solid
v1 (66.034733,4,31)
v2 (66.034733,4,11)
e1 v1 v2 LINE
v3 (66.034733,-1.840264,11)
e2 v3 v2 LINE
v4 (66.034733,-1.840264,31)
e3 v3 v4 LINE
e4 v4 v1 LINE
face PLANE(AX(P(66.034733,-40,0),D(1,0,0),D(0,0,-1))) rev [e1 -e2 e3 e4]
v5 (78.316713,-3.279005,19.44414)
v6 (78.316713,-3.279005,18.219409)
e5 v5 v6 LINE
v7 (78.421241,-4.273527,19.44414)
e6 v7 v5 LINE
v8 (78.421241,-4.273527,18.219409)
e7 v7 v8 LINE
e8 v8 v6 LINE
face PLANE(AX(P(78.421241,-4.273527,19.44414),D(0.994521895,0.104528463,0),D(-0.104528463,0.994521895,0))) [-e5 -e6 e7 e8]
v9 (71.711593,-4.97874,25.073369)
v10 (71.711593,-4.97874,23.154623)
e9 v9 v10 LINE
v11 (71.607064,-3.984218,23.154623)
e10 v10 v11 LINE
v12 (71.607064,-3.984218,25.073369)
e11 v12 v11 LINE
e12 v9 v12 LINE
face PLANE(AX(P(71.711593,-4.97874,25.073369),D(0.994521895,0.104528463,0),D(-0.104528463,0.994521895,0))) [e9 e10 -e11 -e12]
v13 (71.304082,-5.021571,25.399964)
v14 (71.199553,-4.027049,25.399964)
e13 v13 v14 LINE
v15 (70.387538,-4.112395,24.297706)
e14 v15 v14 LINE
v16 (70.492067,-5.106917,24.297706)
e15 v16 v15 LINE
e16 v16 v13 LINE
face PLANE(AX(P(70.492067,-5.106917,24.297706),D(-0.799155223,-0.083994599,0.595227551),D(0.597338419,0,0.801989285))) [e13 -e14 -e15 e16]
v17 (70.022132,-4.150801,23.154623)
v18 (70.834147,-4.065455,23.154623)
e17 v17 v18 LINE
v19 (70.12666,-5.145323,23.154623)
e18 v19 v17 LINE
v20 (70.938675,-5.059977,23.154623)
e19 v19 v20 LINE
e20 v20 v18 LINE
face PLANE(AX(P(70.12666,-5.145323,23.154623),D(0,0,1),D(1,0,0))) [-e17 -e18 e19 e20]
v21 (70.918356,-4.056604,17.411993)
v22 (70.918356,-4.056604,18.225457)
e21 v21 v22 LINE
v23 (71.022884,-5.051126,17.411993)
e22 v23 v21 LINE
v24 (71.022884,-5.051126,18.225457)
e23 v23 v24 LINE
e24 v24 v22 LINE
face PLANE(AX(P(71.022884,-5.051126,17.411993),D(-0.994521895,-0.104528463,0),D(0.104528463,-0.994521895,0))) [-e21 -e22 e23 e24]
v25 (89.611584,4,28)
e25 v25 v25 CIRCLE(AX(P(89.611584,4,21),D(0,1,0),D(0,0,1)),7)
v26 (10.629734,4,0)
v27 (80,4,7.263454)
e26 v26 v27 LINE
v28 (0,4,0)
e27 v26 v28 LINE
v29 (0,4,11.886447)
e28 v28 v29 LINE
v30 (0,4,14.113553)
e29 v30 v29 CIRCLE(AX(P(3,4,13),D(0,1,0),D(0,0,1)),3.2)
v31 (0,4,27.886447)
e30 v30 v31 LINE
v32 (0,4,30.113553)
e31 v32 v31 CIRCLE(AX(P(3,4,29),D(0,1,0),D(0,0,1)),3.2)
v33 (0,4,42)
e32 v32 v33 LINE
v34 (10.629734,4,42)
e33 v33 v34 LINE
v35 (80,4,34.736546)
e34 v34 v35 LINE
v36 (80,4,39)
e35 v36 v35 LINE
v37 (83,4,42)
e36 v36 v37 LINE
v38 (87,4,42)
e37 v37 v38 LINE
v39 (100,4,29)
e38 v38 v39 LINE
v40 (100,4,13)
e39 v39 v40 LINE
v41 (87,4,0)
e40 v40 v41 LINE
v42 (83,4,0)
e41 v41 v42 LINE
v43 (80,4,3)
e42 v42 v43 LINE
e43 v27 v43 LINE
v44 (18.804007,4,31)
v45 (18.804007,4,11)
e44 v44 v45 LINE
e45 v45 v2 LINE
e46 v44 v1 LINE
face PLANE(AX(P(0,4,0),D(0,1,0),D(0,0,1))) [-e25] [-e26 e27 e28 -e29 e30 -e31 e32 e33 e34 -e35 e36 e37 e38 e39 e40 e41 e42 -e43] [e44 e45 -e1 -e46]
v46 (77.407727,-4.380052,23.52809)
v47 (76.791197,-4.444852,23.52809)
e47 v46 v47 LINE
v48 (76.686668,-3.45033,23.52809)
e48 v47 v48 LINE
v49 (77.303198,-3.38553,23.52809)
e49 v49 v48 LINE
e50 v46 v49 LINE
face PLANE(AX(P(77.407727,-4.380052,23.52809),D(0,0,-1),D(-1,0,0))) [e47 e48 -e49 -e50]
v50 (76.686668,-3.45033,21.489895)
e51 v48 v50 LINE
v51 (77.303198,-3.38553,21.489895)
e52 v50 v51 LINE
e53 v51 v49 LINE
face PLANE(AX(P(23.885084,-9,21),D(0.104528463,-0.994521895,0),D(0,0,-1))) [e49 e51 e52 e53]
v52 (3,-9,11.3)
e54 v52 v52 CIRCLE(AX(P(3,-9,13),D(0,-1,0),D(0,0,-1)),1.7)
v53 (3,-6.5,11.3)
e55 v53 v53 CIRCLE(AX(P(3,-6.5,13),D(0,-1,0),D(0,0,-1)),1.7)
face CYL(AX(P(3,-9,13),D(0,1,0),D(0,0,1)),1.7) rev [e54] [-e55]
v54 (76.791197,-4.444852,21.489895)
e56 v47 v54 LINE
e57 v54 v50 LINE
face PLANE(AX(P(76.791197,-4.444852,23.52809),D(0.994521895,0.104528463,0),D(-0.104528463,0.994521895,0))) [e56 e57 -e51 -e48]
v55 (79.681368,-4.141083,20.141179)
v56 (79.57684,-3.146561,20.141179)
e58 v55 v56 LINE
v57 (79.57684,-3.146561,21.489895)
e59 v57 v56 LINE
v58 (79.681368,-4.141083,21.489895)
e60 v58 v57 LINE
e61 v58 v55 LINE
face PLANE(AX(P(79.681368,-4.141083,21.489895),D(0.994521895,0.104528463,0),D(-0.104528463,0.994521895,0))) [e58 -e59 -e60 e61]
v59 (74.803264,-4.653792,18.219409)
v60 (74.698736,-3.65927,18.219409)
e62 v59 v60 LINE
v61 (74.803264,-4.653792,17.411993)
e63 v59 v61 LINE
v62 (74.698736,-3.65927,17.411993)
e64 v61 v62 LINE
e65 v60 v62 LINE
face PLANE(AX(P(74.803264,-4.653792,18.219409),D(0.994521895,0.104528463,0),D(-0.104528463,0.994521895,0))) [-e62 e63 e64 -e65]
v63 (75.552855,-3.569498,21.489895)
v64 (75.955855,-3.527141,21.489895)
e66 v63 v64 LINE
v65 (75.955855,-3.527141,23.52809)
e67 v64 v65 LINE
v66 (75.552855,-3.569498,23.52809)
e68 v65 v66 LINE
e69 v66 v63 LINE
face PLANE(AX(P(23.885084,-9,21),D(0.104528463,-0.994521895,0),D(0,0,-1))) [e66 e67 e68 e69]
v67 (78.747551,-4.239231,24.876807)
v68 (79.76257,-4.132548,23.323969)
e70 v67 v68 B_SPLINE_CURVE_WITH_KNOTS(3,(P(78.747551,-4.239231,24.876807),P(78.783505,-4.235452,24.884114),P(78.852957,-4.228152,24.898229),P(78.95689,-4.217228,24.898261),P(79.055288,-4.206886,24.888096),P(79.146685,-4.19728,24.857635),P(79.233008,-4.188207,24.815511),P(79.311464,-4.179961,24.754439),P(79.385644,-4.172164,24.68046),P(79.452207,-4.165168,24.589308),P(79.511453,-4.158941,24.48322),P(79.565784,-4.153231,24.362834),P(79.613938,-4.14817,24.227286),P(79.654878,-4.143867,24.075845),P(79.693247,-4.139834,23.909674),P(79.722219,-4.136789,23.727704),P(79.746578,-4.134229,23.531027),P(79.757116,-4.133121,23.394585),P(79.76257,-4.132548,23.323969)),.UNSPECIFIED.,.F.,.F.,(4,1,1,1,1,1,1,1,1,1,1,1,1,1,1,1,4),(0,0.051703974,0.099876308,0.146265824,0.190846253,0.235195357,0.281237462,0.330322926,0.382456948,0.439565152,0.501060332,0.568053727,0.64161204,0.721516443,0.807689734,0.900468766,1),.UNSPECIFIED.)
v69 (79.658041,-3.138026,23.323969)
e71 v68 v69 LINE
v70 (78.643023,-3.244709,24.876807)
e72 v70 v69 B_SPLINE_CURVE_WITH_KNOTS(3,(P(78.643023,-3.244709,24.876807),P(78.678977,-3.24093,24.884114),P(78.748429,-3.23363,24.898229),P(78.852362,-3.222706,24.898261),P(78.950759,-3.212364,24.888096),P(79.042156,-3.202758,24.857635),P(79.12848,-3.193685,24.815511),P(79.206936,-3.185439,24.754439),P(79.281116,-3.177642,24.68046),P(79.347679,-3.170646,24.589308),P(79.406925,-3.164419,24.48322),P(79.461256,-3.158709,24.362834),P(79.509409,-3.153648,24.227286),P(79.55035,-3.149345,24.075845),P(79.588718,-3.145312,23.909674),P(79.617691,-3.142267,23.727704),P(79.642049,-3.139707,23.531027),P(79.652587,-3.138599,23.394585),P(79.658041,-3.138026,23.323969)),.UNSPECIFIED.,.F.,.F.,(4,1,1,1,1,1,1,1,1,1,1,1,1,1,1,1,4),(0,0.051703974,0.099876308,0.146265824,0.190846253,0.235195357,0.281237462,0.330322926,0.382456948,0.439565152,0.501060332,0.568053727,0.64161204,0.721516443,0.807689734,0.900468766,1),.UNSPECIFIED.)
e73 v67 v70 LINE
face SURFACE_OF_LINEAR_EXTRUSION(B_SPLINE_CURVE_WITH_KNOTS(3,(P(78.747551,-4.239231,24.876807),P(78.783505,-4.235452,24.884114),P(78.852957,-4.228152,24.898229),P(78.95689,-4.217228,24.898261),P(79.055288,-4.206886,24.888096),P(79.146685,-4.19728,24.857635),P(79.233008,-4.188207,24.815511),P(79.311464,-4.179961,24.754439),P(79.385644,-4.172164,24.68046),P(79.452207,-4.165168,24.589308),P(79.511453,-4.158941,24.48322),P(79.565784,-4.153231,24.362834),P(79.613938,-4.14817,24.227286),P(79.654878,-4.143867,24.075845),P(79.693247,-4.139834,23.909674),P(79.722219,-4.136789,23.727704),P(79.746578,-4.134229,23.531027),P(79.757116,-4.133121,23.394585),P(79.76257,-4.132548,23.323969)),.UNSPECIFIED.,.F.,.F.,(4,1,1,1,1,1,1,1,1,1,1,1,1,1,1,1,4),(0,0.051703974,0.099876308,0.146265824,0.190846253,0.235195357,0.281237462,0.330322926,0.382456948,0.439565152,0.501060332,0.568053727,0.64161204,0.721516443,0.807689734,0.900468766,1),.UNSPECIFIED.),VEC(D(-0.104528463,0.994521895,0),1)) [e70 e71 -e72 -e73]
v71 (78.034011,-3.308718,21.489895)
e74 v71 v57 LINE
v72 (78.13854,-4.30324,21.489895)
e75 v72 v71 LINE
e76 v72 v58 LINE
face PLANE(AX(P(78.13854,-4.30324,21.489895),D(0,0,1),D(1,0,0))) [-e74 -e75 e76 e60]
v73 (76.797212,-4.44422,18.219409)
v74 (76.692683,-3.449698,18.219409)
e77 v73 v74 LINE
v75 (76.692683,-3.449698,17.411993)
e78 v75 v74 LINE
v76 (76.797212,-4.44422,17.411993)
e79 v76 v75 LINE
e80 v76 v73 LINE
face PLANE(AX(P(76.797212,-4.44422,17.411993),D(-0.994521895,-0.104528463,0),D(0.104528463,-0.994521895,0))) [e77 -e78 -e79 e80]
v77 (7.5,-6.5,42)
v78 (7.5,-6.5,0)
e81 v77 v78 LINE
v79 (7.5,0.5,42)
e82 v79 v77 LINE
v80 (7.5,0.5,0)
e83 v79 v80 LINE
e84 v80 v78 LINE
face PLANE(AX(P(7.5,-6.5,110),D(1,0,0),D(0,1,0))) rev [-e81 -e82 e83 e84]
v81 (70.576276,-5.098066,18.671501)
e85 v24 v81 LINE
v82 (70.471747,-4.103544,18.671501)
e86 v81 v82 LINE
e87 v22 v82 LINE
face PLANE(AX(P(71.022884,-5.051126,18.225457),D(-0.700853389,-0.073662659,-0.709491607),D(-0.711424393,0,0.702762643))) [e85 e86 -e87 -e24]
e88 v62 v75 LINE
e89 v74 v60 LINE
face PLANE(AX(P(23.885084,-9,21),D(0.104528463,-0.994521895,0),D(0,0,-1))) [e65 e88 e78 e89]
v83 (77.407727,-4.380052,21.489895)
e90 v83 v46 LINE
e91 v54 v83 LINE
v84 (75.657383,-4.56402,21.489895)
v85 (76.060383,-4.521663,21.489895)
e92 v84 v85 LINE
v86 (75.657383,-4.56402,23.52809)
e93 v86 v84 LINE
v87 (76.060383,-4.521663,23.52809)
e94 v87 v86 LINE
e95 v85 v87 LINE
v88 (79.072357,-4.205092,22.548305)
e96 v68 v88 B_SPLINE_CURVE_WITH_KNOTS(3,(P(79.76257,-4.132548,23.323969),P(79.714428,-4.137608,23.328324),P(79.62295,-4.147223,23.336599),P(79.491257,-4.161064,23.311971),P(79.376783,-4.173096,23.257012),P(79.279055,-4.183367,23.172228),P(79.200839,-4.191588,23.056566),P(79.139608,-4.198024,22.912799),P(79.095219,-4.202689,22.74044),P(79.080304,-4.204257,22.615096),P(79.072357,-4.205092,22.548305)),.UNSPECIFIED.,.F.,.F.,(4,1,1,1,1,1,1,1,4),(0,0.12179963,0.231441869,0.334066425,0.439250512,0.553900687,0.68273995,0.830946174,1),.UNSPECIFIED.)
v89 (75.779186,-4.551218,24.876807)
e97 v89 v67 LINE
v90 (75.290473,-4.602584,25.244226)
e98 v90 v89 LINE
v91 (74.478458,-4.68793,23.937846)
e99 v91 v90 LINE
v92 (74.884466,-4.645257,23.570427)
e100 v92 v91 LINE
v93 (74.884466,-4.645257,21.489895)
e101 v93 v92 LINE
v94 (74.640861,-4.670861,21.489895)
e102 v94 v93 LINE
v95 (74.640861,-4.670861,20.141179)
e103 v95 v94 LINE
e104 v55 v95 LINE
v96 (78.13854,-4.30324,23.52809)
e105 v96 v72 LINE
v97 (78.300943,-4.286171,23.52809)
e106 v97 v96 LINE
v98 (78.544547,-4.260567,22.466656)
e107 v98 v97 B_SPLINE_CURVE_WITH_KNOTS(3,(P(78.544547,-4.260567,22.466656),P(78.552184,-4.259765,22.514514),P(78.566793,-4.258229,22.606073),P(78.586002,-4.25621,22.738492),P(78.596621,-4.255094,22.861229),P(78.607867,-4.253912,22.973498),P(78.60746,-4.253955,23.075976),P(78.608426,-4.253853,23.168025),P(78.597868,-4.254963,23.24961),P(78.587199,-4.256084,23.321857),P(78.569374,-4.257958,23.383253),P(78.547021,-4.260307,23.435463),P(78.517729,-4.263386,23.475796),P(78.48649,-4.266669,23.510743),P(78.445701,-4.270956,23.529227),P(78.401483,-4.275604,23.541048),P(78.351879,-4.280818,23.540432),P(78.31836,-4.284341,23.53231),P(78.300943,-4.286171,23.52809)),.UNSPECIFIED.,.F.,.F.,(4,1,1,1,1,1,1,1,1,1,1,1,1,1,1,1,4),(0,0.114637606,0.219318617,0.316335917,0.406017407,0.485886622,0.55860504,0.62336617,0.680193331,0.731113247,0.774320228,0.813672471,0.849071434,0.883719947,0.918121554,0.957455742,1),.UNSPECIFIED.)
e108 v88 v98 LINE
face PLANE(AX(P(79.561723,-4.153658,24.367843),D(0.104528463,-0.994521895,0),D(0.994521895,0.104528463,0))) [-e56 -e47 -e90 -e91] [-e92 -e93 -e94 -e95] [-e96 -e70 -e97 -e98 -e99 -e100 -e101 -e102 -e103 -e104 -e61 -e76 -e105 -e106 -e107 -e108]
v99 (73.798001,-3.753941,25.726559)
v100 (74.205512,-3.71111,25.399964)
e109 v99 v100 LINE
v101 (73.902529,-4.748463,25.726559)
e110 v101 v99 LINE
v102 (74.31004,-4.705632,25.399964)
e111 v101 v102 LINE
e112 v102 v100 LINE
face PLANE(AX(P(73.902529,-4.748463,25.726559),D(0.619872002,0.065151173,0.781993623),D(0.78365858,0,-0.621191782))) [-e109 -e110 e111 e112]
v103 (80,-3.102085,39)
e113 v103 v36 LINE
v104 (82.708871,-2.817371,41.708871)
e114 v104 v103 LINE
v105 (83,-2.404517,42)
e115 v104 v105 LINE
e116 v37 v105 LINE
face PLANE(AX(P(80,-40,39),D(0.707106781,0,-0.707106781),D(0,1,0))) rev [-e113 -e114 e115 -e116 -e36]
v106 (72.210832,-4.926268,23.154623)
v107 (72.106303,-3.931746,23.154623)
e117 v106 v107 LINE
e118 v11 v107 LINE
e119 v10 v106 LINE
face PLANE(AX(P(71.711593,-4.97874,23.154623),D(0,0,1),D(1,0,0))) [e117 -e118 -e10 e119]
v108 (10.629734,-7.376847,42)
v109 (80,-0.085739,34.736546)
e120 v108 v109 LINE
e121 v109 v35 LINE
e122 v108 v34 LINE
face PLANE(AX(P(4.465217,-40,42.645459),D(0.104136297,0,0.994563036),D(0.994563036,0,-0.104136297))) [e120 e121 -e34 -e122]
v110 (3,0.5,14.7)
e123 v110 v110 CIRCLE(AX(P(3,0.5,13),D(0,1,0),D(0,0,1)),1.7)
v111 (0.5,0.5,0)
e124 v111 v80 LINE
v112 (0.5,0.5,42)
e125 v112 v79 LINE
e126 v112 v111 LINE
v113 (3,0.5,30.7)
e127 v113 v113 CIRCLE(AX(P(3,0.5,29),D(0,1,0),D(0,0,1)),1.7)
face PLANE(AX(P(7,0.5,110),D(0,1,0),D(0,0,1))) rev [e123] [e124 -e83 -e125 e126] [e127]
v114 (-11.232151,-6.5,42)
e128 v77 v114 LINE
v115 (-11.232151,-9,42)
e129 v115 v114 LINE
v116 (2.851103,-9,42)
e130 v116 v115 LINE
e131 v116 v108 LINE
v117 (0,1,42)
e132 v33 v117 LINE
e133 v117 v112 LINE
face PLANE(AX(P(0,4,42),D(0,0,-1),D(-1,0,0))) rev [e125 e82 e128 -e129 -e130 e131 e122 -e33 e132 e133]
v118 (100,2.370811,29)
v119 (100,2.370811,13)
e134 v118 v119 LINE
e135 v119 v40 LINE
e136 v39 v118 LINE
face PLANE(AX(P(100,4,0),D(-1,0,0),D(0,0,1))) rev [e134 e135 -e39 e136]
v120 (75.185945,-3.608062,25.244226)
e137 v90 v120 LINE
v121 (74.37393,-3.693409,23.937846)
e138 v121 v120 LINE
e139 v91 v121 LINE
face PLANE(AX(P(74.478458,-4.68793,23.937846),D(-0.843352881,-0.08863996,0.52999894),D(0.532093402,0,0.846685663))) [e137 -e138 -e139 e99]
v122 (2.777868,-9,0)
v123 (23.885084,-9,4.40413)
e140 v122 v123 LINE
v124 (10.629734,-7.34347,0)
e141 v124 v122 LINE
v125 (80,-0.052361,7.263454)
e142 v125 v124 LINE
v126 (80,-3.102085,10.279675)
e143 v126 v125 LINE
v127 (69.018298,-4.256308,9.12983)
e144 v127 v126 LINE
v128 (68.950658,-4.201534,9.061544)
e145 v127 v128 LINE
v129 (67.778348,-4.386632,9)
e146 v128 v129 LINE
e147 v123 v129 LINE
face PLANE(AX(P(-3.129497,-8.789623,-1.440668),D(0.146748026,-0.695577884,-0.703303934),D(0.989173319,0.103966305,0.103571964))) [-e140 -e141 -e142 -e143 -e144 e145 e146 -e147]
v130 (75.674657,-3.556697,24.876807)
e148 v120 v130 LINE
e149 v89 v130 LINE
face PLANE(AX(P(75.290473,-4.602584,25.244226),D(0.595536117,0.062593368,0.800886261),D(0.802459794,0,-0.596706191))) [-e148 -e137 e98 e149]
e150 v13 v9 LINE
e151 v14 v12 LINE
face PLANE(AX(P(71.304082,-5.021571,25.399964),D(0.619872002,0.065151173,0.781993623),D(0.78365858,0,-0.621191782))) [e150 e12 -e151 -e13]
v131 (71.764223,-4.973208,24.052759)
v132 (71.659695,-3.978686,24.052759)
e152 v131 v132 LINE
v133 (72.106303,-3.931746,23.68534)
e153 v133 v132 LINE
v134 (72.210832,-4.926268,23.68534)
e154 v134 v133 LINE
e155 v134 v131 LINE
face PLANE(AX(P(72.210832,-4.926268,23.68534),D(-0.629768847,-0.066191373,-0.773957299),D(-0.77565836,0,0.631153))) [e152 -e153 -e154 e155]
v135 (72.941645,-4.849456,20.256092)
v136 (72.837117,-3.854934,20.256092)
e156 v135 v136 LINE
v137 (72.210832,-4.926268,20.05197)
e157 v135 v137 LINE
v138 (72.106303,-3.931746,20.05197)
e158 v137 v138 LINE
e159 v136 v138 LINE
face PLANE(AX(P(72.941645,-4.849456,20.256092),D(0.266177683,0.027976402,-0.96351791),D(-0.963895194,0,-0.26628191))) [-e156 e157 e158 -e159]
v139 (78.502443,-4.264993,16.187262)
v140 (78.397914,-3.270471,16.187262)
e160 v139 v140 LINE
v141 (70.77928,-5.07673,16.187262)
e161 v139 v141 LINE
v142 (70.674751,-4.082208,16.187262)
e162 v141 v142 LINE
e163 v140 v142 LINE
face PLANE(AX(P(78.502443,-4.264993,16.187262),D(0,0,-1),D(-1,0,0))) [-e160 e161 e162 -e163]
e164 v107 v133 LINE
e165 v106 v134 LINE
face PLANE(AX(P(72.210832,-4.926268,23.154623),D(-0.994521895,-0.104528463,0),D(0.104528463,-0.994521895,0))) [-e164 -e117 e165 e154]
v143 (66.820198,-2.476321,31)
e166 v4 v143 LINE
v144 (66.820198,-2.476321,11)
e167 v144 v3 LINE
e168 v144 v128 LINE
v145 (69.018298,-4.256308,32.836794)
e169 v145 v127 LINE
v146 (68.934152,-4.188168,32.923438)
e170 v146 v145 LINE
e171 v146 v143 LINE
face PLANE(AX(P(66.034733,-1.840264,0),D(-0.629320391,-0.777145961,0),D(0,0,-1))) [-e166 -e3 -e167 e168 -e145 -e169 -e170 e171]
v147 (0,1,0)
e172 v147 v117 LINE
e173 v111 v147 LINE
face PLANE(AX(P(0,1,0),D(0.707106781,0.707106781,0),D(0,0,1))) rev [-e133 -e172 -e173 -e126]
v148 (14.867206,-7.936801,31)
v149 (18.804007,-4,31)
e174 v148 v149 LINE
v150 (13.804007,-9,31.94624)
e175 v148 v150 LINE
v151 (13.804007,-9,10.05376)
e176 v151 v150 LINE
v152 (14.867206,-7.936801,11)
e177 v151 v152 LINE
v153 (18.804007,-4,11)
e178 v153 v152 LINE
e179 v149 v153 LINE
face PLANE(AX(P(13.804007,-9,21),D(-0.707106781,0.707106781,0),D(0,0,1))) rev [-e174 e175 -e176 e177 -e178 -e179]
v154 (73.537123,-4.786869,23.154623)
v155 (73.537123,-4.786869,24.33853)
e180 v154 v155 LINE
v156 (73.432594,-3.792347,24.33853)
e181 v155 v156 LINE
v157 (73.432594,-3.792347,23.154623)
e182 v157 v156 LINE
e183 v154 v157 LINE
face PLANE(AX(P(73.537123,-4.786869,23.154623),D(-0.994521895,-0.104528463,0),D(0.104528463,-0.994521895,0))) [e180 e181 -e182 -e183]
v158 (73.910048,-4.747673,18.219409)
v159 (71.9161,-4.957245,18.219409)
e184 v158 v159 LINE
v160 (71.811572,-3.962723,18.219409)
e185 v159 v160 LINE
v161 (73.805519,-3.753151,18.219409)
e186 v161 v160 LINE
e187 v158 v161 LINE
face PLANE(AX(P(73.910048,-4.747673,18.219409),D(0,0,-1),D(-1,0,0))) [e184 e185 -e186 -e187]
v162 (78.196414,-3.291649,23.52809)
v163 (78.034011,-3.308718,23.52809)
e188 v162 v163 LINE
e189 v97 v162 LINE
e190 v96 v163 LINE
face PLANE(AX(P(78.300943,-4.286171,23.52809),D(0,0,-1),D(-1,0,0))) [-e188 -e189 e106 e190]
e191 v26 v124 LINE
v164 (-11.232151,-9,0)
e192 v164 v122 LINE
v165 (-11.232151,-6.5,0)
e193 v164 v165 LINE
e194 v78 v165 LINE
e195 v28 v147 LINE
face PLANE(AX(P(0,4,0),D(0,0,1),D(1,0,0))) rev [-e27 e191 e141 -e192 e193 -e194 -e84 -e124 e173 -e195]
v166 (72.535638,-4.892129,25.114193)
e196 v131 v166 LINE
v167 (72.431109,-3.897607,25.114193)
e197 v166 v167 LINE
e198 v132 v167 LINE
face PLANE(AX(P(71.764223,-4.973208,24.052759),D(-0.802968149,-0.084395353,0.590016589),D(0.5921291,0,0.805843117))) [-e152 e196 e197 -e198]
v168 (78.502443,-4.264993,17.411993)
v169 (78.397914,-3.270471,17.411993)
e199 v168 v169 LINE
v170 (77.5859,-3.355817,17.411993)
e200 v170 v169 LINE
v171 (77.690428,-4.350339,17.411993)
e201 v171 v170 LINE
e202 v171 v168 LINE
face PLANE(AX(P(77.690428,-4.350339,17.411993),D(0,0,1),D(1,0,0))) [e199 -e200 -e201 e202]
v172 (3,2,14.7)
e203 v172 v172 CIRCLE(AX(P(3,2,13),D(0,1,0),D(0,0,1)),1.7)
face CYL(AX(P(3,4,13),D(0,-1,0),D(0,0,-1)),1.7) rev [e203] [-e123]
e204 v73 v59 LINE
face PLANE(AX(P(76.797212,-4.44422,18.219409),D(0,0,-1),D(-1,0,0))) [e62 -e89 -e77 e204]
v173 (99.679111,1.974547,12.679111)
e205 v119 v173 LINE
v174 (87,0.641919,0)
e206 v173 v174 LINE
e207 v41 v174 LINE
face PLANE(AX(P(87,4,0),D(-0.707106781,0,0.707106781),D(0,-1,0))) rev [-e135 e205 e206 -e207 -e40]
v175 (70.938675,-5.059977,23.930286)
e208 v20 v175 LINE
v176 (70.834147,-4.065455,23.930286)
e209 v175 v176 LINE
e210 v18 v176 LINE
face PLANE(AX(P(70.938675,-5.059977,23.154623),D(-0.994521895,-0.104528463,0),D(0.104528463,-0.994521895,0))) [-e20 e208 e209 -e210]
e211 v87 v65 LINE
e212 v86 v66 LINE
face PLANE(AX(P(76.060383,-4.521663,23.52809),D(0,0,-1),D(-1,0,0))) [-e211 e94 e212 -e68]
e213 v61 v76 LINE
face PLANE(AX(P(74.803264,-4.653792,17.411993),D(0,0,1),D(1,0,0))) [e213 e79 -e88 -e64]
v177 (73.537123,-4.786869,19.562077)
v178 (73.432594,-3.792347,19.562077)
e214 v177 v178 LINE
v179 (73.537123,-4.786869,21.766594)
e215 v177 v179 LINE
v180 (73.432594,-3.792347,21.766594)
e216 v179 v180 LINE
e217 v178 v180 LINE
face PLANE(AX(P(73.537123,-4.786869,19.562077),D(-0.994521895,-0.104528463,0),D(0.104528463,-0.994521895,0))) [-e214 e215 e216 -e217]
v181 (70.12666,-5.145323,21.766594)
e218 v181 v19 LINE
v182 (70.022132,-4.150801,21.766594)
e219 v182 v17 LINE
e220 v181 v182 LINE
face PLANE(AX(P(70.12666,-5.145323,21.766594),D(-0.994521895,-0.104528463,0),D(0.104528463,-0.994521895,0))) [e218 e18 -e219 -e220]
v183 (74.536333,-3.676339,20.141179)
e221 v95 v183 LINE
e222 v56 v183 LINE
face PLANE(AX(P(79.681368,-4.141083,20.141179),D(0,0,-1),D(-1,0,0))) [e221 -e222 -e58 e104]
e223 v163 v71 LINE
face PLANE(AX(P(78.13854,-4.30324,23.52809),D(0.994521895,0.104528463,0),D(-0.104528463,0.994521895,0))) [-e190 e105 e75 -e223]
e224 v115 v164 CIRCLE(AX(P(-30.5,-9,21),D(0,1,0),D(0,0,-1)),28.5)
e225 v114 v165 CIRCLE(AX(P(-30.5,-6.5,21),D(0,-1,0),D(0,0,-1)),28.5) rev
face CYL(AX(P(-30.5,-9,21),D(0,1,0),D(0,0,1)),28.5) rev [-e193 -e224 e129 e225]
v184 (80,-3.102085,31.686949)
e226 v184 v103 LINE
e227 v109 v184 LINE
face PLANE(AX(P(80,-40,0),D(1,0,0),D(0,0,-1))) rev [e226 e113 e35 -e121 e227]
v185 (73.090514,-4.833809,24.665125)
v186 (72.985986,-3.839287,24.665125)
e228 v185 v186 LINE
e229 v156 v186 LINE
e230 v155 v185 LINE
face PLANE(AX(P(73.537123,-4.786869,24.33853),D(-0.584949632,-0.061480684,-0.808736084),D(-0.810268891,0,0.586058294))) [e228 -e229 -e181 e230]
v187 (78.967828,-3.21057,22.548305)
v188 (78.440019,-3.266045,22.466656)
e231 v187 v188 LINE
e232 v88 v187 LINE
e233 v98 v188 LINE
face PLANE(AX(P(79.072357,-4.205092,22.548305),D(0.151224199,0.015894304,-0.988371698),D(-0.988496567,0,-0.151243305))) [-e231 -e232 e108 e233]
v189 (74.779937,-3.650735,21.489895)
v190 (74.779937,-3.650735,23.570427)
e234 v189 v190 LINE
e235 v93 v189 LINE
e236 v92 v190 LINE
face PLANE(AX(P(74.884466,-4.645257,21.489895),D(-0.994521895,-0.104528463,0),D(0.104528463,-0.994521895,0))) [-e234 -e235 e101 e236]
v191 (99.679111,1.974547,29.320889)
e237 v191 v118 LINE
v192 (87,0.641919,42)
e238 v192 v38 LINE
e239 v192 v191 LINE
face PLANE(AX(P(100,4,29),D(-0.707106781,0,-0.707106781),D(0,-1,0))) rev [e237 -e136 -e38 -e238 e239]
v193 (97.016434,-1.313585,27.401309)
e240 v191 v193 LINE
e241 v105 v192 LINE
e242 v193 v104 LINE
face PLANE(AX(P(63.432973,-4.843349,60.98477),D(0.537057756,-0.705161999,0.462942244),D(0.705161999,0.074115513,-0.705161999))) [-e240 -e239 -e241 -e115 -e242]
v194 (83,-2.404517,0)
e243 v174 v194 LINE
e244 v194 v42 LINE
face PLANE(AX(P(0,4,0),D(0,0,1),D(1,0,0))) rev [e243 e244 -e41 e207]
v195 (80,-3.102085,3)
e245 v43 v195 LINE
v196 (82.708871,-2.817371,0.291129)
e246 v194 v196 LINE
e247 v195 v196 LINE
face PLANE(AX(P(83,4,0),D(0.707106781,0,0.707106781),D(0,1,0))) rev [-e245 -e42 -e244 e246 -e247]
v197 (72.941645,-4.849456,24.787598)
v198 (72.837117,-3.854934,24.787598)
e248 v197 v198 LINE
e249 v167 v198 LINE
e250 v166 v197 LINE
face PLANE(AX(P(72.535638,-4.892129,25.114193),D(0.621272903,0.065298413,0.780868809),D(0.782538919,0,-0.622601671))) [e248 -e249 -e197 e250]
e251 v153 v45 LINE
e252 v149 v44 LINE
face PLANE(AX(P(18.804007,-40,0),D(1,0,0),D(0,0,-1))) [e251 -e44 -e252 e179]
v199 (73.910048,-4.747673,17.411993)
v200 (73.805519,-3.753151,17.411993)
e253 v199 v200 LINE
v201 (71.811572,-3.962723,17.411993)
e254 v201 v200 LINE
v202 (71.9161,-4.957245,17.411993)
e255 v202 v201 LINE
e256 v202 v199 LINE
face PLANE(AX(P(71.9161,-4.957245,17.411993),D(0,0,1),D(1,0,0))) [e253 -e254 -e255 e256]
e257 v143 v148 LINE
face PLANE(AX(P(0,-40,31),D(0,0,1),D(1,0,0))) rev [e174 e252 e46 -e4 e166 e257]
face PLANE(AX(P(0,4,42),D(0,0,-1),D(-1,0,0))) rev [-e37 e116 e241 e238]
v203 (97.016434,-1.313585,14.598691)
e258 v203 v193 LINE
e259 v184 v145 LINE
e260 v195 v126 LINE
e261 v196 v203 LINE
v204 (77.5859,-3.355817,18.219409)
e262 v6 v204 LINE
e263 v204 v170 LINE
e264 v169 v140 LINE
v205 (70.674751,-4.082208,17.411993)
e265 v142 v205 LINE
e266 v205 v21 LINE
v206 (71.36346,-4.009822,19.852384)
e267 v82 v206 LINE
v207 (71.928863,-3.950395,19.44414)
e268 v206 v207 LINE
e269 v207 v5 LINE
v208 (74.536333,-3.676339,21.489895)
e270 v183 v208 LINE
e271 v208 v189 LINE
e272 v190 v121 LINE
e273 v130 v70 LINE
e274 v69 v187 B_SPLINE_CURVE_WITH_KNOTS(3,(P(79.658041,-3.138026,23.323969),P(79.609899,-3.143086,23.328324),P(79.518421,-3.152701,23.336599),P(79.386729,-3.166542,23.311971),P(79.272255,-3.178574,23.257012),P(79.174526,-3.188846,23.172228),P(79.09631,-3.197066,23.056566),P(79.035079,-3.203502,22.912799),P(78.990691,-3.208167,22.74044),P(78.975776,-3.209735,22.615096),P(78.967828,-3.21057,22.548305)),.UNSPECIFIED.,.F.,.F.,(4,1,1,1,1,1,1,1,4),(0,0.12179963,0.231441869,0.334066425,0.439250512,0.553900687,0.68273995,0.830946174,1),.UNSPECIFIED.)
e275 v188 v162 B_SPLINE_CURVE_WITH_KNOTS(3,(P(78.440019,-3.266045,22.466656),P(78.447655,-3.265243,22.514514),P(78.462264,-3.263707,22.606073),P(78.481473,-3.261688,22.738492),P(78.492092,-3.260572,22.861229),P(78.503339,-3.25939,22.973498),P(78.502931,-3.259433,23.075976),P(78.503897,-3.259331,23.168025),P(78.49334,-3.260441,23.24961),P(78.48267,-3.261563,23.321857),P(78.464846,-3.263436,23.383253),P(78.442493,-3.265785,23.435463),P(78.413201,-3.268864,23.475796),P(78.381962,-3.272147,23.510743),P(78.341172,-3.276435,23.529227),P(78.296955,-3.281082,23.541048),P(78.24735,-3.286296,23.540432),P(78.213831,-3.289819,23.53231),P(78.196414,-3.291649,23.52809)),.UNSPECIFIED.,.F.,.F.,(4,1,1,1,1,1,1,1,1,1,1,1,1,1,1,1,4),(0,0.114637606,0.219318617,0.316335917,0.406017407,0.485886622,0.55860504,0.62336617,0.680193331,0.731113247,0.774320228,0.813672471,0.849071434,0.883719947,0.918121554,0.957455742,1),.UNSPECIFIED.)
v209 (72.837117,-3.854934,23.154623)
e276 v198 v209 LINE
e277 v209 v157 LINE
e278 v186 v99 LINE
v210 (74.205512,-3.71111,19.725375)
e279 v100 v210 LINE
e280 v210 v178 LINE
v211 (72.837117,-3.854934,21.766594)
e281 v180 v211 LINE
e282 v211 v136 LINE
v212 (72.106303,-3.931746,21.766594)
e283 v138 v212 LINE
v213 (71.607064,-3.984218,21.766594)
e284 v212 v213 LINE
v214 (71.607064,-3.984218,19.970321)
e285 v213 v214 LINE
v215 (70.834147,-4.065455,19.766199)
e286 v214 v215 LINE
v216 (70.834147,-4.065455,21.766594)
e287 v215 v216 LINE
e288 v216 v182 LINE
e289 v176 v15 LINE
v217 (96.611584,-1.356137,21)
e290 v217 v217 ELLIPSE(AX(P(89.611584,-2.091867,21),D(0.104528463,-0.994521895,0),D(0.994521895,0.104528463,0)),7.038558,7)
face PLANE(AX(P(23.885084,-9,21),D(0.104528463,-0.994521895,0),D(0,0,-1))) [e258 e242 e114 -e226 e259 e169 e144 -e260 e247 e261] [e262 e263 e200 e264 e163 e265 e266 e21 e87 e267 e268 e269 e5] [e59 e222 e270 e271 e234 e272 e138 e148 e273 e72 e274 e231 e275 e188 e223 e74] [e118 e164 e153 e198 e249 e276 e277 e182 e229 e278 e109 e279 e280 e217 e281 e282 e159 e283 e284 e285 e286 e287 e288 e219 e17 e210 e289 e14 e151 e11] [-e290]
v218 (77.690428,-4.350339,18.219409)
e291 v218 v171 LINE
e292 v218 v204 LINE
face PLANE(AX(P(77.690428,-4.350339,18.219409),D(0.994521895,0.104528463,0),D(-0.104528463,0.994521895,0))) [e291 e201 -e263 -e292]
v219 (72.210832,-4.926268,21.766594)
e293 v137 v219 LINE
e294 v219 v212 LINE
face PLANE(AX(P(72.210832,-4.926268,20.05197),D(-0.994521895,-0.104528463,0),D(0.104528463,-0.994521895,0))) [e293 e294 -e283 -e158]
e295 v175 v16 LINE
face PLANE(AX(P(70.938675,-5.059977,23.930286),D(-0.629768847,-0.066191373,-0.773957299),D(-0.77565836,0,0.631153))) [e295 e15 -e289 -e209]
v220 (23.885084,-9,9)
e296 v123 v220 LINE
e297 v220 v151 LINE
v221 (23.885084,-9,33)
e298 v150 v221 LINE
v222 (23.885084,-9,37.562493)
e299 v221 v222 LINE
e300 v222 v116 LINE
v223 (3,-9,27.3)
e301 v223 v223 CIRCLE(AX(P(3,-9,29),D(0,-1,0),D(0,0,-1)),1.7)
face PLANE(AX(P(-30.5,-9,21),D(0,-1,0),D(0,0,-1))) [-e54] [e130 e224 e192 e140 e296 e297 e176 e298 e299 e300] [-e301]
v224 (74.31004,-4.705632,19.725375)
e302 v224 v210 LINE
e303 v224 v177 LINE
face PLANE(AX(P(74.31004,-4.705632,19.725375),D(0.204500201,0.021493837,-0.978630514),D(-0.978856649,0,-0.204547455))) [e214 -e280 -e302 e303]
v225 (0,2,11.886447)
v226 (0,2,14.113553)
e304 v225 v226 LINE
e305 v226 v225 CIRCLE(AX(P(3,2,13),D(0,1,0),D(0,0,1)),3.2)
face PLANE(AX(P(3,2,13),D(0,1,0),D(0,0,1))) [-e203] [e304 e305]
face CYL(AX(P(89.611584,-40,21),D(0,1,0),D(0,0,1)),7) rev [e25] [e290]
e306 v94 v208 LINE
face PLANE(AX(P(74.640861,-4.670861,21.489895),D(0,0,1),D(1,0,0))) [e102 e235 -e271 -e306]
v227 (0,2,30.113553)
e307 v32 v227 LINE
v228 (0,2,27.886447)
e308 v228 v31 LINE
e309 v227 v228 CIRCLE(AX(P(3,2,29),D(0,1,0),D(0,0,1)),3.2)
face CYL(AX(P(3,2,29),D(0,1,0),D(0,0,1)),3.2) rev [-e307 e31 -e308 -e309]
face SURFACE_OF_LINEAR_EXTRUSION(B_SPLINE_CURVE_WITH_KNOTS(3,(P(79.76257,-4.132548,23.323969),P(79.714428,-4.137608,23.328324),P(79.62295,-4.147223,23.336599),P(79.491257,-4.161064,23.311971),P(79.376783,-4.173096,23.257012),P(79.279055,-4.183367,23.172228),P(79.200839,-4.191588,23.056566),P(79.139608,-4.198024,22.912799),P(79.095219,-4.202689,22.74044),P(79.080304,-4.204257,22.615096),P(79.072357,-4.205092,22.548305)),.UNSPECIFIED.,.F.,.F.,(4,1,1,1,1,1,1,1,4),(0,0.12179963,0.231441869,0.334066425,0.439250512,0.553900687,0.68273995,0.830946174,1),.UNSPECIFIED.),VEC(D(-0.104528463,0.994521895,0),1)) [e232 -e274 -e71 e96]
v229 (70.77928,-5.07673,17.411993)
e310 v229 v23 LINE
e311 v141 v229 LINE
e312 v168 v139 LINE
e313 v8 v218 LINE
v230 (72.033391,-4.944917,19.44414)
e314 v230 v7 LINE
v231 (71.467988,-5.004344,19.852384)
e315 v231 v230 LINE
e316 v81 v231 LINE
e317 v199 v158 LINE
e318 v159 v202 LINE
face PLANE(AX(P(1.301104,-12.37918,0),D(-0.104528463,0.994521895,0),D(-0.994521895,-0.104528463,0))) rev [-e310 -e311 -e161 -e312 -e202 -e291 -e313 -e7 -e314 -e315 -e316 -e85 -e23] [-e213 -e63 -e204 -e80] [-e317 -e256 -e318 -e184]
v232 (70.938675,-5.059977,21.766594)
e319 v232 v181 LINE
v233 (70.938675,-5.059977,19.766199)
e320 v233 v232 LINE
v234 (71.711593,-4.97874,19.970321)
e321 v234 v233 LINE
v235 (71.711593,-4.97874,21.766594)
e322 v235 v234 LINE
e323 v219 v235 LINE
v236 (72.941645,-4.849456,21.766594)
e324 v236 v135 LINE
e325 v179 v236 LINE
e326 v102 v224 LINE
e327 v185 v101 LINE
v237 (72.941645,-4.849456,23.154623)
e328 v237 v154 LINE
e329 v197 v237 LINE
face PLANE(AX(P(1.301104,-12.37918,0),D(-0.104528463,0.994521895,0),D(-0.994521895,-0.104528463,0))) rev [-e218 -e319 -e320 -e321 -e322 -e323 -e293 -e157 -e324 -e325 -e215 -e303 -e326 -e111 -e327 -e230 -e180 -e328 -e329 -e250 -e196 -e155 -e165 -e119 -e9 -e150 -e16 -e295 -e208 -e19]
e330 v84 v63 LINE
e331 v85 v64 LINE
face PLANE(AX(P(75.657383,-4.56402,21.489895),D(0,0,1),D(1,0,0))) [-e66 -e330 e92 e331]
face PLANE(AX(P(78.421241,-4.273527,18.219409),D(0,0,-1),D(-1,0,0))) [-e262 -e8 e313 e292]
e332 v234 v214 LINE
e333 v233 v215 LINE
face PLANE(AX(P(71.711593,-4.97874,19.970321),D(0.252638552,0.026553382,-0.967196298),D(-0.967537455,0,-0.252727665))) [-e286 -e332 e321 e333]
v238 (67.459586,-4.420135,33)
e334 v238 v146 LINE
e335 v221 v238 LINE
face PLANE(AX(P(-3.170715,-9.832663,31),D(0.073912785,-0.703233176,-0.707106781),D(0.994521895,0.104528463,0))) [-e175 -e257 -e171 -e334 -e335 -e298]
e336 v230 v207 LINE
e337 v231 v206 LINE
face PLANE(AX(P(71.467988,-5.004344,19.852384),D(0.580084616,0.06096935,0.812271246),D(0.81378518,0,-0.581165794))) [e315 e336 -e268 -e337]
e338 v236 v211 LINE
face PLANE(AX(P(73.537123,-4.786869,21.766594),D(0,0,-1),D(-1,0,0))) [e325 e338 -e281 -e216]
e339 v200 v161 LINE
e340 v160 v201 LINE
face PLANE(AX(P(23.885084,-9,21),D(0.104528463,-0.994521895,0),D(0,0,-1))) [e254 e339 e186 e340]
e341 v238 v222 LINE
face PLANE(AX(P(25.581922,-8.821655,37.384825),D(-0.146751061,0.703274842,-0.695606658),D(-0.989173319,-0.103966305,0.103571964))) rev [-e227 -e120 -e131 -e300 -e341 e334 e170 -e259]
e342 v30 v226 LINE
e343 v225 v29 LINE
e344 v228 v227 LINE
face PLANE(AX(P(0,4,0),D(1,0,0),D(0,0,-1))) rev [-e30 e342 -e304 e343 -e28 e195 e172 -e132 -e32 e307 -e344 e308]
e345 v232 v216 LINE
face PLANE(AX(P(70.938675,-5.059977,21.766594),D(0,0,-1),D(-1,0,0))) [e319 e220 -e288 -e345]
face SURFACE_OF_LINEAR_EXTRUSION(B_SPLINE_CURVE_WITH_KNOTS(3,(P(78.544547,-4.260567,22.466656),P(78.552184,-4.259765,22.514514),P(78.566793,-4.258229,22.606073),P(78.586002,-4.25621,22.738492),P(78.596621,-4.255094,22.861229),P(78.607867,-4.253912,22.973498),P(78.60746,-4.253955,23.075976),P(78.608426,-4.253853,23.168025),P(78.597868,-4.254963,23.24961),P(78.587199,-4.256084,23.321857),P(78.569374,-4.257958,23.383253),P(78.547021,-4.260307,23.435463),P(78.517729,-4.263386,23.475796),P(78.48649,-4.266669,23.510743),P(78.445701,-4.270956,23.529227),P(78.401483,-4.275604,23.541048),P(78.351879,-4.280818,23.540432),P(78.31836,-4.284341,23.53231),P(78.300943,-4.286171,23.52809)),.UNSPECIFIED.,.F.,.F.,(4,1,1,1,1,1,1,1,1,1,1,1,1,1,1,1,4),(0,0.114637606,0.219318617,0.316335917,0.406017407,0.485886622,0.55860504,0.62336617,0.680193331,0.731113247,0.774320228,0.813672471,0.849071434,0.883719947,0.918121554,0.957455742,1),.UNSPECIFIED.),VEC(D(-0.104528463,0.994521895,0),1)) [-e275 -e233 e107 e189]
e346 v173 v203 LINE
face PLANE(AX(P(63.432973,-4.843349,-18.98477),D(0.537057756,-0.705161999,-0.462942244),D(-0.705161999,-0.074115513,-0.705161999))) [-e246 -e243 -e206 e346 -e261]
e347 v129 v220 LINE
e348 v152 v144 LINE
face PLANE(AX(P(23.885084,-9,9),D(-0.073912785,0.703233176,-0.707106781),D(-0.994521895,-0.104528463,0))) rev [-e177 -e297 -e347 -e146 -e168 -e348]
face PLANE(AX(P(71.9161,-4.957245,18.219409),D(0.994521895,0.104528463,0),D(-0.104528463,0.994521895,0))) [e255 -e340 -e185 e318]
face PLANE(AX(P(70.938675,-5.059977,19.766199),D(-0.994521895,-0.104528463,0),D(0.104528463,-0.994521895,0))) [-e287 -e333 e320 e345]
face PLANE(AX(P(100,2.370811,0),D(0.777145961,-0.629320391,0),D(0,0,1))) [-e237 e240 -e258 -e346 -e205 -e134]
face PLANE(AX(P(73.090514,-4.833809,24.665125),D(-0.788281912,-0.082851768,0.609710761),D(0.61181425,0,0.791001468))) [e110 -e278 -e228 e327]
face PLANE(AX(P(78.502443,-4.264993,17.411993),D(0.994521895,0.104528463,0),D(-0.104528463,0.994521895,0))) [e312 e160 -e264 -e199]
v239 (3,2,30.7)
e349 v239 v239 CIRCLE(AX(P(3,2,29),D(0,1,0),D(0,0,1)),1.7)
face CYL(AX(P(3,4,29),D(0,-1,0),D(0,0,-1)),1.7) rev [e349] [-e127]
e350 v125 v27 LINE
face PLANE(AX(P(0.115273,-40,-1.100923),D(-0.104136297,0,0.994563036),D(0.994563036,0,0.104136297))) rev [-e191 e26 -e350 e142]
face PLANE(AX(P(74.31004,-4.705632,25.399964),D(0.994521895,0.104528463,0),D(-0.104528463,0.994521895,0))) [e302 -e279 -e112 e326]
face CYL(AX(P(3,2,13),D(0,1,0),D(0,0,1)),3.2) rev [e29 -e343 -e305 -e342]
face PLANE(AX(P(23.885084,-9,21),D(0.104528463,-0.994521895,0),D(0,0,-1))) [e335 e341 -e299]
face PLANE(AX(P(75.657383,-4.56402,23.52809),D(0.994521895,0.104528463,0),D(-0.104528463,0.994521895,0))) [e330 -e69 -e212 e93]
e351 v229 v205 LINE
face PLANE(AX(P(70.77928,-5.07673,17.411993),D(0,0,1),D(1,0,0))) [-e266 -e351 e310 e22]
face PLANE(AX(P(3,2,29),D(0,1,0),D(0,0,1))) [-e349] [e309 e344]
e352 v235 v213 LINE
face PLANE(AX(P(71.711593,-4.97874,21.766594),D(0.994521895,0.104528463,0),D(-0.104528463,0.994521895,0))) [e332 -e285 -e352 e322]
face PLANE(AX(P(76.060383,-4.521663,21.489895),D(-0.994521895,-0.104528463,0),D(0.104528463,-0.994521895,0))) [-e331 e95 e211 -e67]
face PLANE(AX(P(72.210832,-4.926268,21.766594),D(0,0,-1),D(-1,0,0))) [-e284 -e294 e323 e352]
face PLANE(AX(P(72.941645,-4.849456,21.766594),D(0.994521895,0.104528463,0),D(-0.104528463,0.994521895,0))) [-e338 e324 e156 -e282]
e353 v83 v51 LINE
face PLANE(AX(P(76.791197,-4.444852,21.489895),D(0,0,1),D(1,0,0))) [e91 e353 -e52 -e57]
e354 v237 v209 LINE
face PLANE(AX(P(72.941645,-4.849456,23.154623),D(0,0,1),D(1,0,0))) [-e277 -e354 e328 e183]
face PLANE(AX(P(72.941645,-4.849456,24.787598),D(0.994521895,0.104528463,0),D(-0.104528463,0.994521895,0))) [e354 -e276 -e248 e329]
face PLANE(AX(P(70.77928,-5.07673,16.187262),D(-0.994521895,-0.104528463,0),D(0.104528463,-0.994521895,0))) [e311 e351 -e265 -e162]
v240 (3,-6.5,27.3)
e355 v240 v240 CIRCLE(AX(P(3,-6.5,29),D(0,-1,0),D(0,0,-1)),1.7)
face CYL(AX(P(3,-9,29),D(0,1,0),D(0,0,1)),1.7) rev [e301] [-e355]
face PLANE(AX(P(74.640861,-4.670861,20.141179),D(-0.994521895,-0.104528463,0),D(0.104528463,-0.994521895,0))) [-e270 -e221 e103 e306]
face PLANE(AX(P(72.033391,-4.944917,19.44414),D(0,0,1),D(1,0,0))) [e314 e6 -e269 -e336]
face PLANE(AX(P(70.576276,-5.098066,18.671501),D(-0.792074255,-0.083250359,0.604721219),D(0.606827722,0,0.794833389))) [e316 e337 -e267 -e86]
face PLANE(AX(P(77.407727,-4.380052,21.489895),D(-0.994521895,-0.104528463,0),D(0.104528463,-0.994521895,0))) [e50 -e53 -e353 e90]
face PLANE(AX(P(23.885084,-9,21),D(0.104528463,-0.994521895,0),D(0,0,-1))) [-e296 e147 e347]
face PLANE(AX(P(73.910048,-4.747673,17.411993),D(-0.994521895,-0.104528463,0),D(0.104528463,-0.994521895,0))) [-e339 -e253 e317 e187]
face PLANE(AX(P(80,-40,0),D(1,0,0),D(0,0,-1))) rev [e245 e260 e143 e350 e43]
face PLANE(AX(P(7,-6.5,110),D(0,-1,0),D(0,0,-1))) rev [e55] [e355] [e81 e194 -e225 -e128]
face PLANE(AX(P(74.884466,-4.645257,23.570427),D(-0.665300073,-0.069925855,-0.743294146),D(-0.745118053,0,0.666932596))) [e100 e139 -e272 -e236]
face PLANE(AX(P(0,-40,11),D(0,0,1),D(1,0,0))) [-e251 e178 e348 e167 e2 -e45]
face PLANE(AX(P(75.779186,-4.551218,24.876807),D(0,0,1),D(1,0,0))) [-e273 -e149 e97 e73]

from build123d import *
from OCP.BRepFilletAPI import BRepFilletAPI_MakeChamfer

# Parameters (mm, degrees)
SKETCH_1_W          = 100
SKETCH_1_H          = 42
SKETCH_1_R          = 1.7
EXTRUDE_1_DEPTH     = 4
SKETCH_4_W          = 93
SKETCH_4_H          = 42
EXTRUDE_3_DEPTH     = 6
EXTRUDE_START       = 3
SKETCH_5_R          = 1.7
EXTRUDE_4_DEPTH     = 3
CHAMFER_1_SIZE      = 8
CHAMFER_1_SIZE2     = 76.114915634
CHAMFER_2_SIZE      = 1
SKETCH_13_W         = 47.230725809
SKETCH_13_H         = 10
SKETCH_13_R         = 7
CUT_EXTRUDE_4_DEPTH = 44
CHAMFER_6_SIZE      = 13
CHAMFER_7_SIZE      = 3
SKETCH_11_W         = 2.004930736
SKETCH_11_H         = 0.807415545
SKETCH_11_W_2       = 2.004930737
SKETCH_11_W_3       = 0.619925793
SKETCH_11_H_2       = 2.038195048
SKETCH_11_W_4       = 0.405219787
EXTRUDE_6_DEPTH     = 1
CHAMFER_8_SIZE      = 3
CHAMFER_8_SIZE2     = 3.249032056
CHAMFER_8_SIZE2_2   = 3.370811392
CHAMFER_9_SIZE      = 3
CHAMFER_9_SIZE2     = 3.033196678
CHAMFER_10_SIZE     = 5
CHAMFER_11_SIZE     = 3
CHAMFER_11_SIZE2    = 2.729629244
CHAMFER_12_SIZE     = 2
SKETCH_14_R         = 3.2
CUT_EXTRUDE_8_DEPTH = 2
CUT_EXTRUDE_9_DEPTH = 110


with BuildPart() as part:
    # 草图1 → 凸台-拉伸1 (new body)
    with BuildSketch(Plane(origin=(0, 0, 0), x_dir=(1, 0, 0), z_dir=(0, 1, 0))):
        with Locations((50, -21)):
            Rectangle(SKETCH_1_W, SKETCH_1_H)
        with Locations(Location((3, -29, 0), (0, 0, 270))):
            Circle(SKETCH_1_R, mode=Mode.SUBTRACT)
        with Locations(Location((3, -13, 0), (0, 0, 90))):
            Circle(SKETCH_1_R, mode=Mode.SUBTRACT)
    extrude(amount=EXTRUDE_1_DEPTH)

    # 草图4 → 凸台-拉伸3 (add)
    with BuildSketch(Plane.XZ):
        with Locations((53.5, 21)):
            Rectangle(SKETCH_4_W, SKETCH_4_H)
    extrude(amount=EXTRUDE_3_DEPTH)

    # 草图5 → 凸台-拉伸4 (add)
    with BuildSketch(Plane.XZ.offset(6).offset(EXTRUDE_START)):
        with BuildLine():
            Line((0, 42), (100, 42))
            Line((100, 42), (100, 0))
            Line((100, 0), (0, 0))
            Line((0, 0), (-11.232151132, 0))
            ThreePointArc((-11.232151132, 0), (-2, 21), (-11.232151132, 42))
            Line((-11.232151132, 42), (0, 42))
        make_face()
        with Locations(Location((3, 29, 0), (0, 0, 90))):
            Circle(SKETCH_5_R, mode=Mode.SUBTRACT)
        with Locations(Location((3, 13, 0), (0, 0, 270))):
            Circle(SKETCH_5_R, mode=Mode.SUBTRACT)
    extrude(amount=-EXTRUDE_4_DEPTH)

    # 倒角1
    chamfer_1_edges = [part.edges().sort_by_distance(p)[0] for p in [
        (100, -9, 21),
    ]]
    chamfer_1_side = [part.faces().sort_by_distance(p)[0] for p in [
        (100, -2.5, 21),
    ]]
    chamfer(chamfer_1_edges, length=CHAMFER_1_SIZE, length2=CHAMFER_1_SIZE2, reference=chamfer_1_side[0])

    # 倒角2
    chamfer_2_edges = [part.edges().sort_by_distance(p)[0] for p in [
        (0, 0, 21),
    ]]
    chamfer(chamfer_2_edges, length=CHAMFER_2_SIZE)

    # 草图13 → 切除-拉伸4 (cut)
    with BuildSketch(Plane(origin=(0, 4, 0), x_dir=(1, 0, 0), z_dir=(0, 1, 0))):
        Polygon((10.629734183, -42), (80, -42), (80, -34.736546255), align=None)
        with Locations((42.419369789, -26)):
            Rectangle(SKETCH_13_W, SKETCH_13_H)
        Polygon((80, -7.263453745), (80, 0), (10.629734183, 0), align=None)
        with Locations((42.419369789, -16)):
            Rectangle(SKETCH_13_W, SKETCH_13_H)
        with Locations(Location((89.611584168, -21, 0), (0, 0, 270))):
            Circle(SKETCH_13_R)
    extrude(amount=-CUT_EXTRUDE_4_DEPTH, mode=Mode.SUBTRACT)

    # 倒角6
    chamfer_6_edges = [part.edges().sort_by_distance(p)[0] for p in [
        (100, 1.5, 0),
        (100, 1.5, 42),
    ]]
    chamfer(chamfer_6_edges, length=CHAMFER_6_SIZE)

    # 倒角7
    chamfer_7_edges = [part.edges().sort_by_distance(p)[0] for p in [
        (80, 0.448957647, 42),
        (80, 0.448957647, 0),
    ]]
    chamfer(chamfer_7_edges, length=CHAMFER_7_SIZE)

    # 草图11 → 凸台-拉伸6 (add)
    # profile 1 of 3: a face of its own
    with BuildSketch(Plane(origin=(1.196575809, -11.384658341, 0), x_dir=(0.9945218953682733, 0.10452846326765426, 0), z_dir=(0.10452846326765428, -0.9945218953682734, 0))):
        Polygon((69.860880518, 16.187261812), (69.860880518, 17.411993258), (70.105826807, 17.411993258), (70.105826807, 18.22545686), (69.65675861, 18.671501028), (70.553382989, 19.852384064), (71.121900302, 19.444140249), (77.544936327, 19.444140249), (77.544936327, 18.219408803), (76.810097459, 18.219408803), (76.810097459, 17.411993258), (77.62658509, 17.411993258), (77.62658509, 16.187261812), align=None)
        with Locations((74.909495698, 17.815701031)):
            Rectangle(SKETCH_11_W, SKETCH_11_H, mode=Mode.SUBTRACT)
        with Locations((72.006428569, 17.815701031)):
            Rectangle(SKETCH_11_W_2, SKETCH_11_H, mode=Mode.SUBTRACT)
    # profile 2 of 3: a face of its own
    with BuildSketch(Plane(origin=(1.196575809, -11.384658341, 0), x_dir=(0.9945218953682733, 0.10452846326765426, 0), z_dir=(0.10452846326765428, -0.9945218953682734, 0))):
        with BuildLine():
            Line((73.743732804, 20.141178762), (73.743732804, 21.489895366))
            Line((73.743732804, 21.489895366), (73.988679093, 21.489895366))
            Line((73.988679093, 21.489895366), (73.988679093, 23.570426809))
            Line((73.988679093, 23.570426809), (73.580435278, 23.937846243))
            Line((73.580435278, 23.937846243), (74.396922908, 25.244226451))
            Line((74.396922908, 25.244226451), (74.8883275, 24.876807018))
            Line((74.8883275, 24.876807018), (77.873043393, 24.876807018))
            add(Edge.make_bspline(
                [(77.873043393, 24.876807018), (77.909195425, 24.884114021), (77.979030125, 24.898228922), (78.083535505, 24.898260892), (78.18247526, 24.888096269), (78.274375586, 24.857634965), (78.361174864, 24.815510666), (78.440062892, 24.754438601), (78.514651653, 24.680459701), (78.581581254, 24.589308152), (78.641153636, 24.483219793), (78.695783555, 24.362834367), (78.74420221, 24.227285764), (78.78536843, 24.075844921), (78.823948154, 23.909673827), (78.853080426, 23.727704353), (78.87757312, 23.53102708), (78.888168983, 23.394584904), (78.893652931, 23.323968506)],
                knots=[0, 0, 0, 0, 0.827263588, 1.598020928, 2.340253185, 3.053540043, 3.76312571, 4.499799397, 5.285166813, 6.119311175, 7.033042428, 8.016965305, 9.088859635, 10.265792637, 11.544263093, 12.923035739, 14.407500252, 16, 16, 16, 16], degree=3))
            add(Edge.make_bspline(
                [(78.893652931, 23.323968506), (78.845246059, 23.328323663), (78.753264032, 23.336599269), (78.620846423, 23.311971446), (78.505741453, 23.257011785), (78.407474701, 23.17222843), (78.32882796, 23.056565697), (78.267259898, 22.912798583), (78.222626533, 22.740439523), (78.20762963, 22.615095523), (78.199638445, 22.548305257)],
                knots=[0, 0, 0, 0, 0.974397038, 1.851534954, 2.672531398, 3.514004096, 4.431205496, 5.461919598, 6.647569389, 8, 8, 8, 8], degree=3))
            Line((78.199638445, 22.548305257), (77.668921485, 22.466656494))
            add(Edge.make_bspline(
                [(77.668921485, 22.466656494), (77.676599849, 22.514514334), (77.691289688, 22.606073427), (77.710604215, 22.73849245), (77.721281907, 22.861229398), (77.732590351, 22.973497898), (77.732180701, 23.075975967), (77.733151762, 23.168024765), (77.722536119, 23.249609583), (77.711807698, 23.321856538), (77.693885438, 23.383253279), (77.671409021, 23.435462621), (77.641955792, 23.475795943), (77.610544471, 23.510743362), (77.569530677, 23.529227283), (77.525069221, 23.54104806), (77.475191645, 23.540431553), (77.441487802, 23.532310259), (77.423975196, 23.528090414)],
                knots=[0, 0, 0, 0, 1.834201696, 3.509097869, 5.061374665, 6.496278519, 7.774185948, 8.937680646, 9.973858727, 10.883093303, 11.697811954, 12.389123654, 13.018759541, 13.585142942, 14.139519144, 14.689944872, 15.319291869, 16, 16, 16, 16], degree=3))
            Line((77.423975196, 23.528090414), (77.26067767, 23.528090414))
            Line((77.26067767, 23.528090414), (77.26067767, 21.489895366))
            Line((77.26067767, 21.489895366), (78.812004168, 21.489895366))
            Line((78.812004168, 21.489895366), (78.812004168, 20.141178762))
            Line((78.812004168, 20.141178762), (73.743732804, 20.141178762))
        make_face()
        with Locations((76.215875907, 22.50899289)):
            Rectangle(SKETCH_11_W_3, SKETCH_11_H_2, mode=Mode.SUBTRACT)
        with Locations((74.96846425, 22.50899289)):
            Rectangle(SKETCH_11_W_4, SKETCH_11_H_2, mode=Mode.SUBTRACT)
    # profile 3 of 3: a face of its own
    with BuildSketch(Plane(origin=(1.196575809, -11.384658341, 0), x_dir=(0.9945218953682733, 0.10452846326765426, 0), z_dir=(0.10452846326765428, -0.9945218953682734, 0))):
        Polygon((70.021154016, 19.766199258), (70.021154016, 21.766593952), (69.204666385, 21.766593952), (69.204666385, 23.154622924), (70.021154016, 23.154622924), (70.021154016, 23.930286172), (69.572085819, 24.297705606), (70.388573449, 25.399963907), (70.798329279, 25.073368855), (70.798329279, 23.154622924), (71.30031797, 23.154622924), (71.30031797, 23.685339883), (70.851249773, 24.052759317), (71.626913022, 25.114193236), (72.035156837, 24.787598184), (72.035156837, 23.154622924), (72.633914432, 23.154622924), (72.633914432, 24.338529987), (72.184846236, 24.665125039), (73.001333866, 25.726558959), (73.411089695, 25.399963907), (73.411089695, 19.725374877), (72.633914432, 19.562077351), (72.633914432, 21.766593952), (72.035156837, 21.766593952), (72.035156837, 20.256091836), (71.30031797, 20.051969929), (71.30031797, 21.766593952), (70.798329279, 21.766593952), (70.798329279, 19.970321166), align=None)
    extrude(amount=EXTRUDE_6_DEPTH)

    # 倒角8: one chamfer whose edges measure the first distance from different faces: ONE call of the kernel's chamfer builder (chamfer() names one face for all edges)
    chamfer_8_edges_1 = [part.edges().sort_by_distance(p)[0] for p in [
        (93.5, -1.683177529, 6.5),
    ]]
    chamfer_8_side_1 = [part.faces().sort_by_distance(p)[0] for p in [
        (93.239543948, 1.144723718, 6.239543948),
    ]]
    chamfer_8_edges_2 = [part.edges().sort_by_distance(p)[0] for p in [
        (93.5, -1.683177529, 35.5),
    ]]
    chamfer_8_side_2 = [part.faces().sort_by_distance(p)[0] for p in [
        (93.239543948, 1.144723718, 35.760456052),
    ]]
    chamfer_8_edges_3 = [part.edges().sort_by_distance(p)[0] for p in [
        (100, -1, 21),
    ]]
    chamfer_8_side_3 = [part.faces().sort_by_distance(p)[0] for p in [
        (85, -2.576563529, 41.126989093),
    ]]
    chamfer_8 = BRepFilletAPI_MakeChamfer(part.part.solid().wrapped)
    for e in chamfer_8_edges_1:
        chamfer_8.Add(CHAMFER_8_SIZE, CHAMFER_8_SIZE2, e.wrapped, chamfer_8_side_1[0].wrapped)  # the first distance lies on this face
    for e in chamfer_8_edges_2:
        chamfer_8.Add(CHAMFER_8_SIZE, CHAMFER_8_SIZE2, e.wrapped, chamfer_8_side_2[0].wrapped)  # the first distance lies on this face
    for e in chamfer_8_edges_3:
        chamfer_8.Add(CHAMFER_8_SIZE, CHAMFER_8_SIZE2_2, e.wrapped, chamfer_8_side_3[0].wrapped)  # the first distance lies on this face
    add(Compound.cast(chamfer_8.Shape()), mode=Mode.REPLACE)

    # 倒角9: one chamfer whose edges measure the first distance from different faces: ONE call of the kernel's chamfer builder (chamfer() names one face for all edges)
    chamfer_9_edges_1 = [part.edges().sort_by_distance(p)[0] for p in [
        (51.942542183, -6.051042353, 37.674318579),
    ]]
    chamfer_9_side_1 = [part.faces().sort_by_distance(p)[0] for p in [
        (41.723549869, -1.481040701, 38.744304071),
    ]]
    chamfer_9_edges_2 = [part.edges().sort_by_distance(p)[0] for p in [
        (51.942542183, -6.051042353, 4.325681421),
    ]]
    chamfer_9_side_2 = [part.faces().sort_by_distance(p)[0] for p in [
        (81.946304921, -2.897519815, 39.756028252),
    ]]
    chamfer_9 = BRepFilletAPI_MakeChamfer(part.part.solid().wrapped)
    for e in chamfer_9_edges_1:
        chamfer_9.Add(CHAMFER_9_SIZE, CHAMFER_9_SIZE2, e.wrapped, chamfer_9_side_1[0].wrapped)  # the first distance lies on this face
    for e in chamfer_9_edges_2:
        chamfer_9.Add(CHAMFER_9_SIZE, CHAMFER_9_SIZE2, e.wrapped, chamfer_9_side_2[0].wrapped)  # the first distance lies on this face
    add(Compound.cast(chamfer_9.Shape()), mode=Mode.REPLACE)

    # 倒角10
    chamfer_10_edges = [part.edges().sort_by_distance(p)[0] for p in [
        (18.804006885, -9, 21),
    ]]
    chamfer(chamfer_10_edges, length=CHAMFER_10_SIZE)

    # 倒角11
    chamfer_11_edges = [part.edges().sort_by_distance(p)[0] for p in [
        (66.034732694, -4.569893446, 21),
    ]]
    chamfer_11_side = [part.faces().sort_by_distance(p)[0] for p in [
        (24.724422242, -8.911782034, 34.281246688),
    ]]
    chamfer(chamfer_11_edges, length=CHAMFER_11_SIZE, length2=CHAMFER_11_SIZE2, reference=chamfer_11_side[0])

    # 倒角12
    # the kernel refuses this chamfer: 2 mm, written as the material it takes off along each edge
    with BuildSketch(Plane(origin=(-1.690866029, -11.688140707, 31), x_dir=(-0.10452846326765075, 0.9945218953682736, 0), z_dir=(0.9945218953682737, 0.10452846326765075, 0))) as chamfer_12_piece_1_section:
        Polygon((CHAMFER_12_SIZE, 0), (0, CHAMFER_12_SIZE), (0, 0), align=None)
    chamfer_12_piece_1 = extrude(amount=76.24201623, mode=Mode.PRIVATE)
    chamfer_12_piece_1 = split(chamfer_12_piece_1, bisect_by=Plane(origin=(4.712500075, -18.091506811, 31), z_dir=(0.7071067811865476, -0.7071067811865476, 0)), keep=Keep.TOP, mode=Mode.PRIVATE)
    chamfer_12_piece_1 = split(chamfer_12_piece_1, bisect_by=Plane(origin=(29.94779985, 27.382357822, 31), z_dir=(-0.6293203910498405, -0.7771459614569685, 0)), keep=Keep.TOP, mode=Mode.PRIVATE)
    add(chamfer_12_piece_1, mode=Mode.SUBTRACT)
    with BuildSketch(Plane(origin=(-1.690866029, -11.688140707, 11), x_dir=(-0.10452846326765075, 0.9945218953682736, 0), z_dir=(0.9945218953682737, 0.10452846326765075, 0))) as chamfer_12_piece_2_section:
        Polygon((CHAMFER_12_SIZE, 0), (0, -CHAMFER_12_SIZE), (0, 0), align=None)
    chamfer_12_piece_2 = extrude(amount=76.24201623, mode=Mode.PRIVATE)
    chamfer_12_piece_2 = split(chamfer_12_piece_2, bisect_by=Plane(origin=(4.712500075, -18.091506811, 11), z_dir=(0.7071067811865476, -0.7071067811865476, 0)), keep=Keep.TOP, mode=Mode.PRIVATE)
    chamfer_12_piece_2 = split(chamfer_12_piece_2, bisect_by=Plane(origin=(29.94779985, 27.382357822, 11), z_dir=(-0.6293203910498405, -0.7771459614569685, 0)), keep=Keep.TOP, mode=Mode.PRIVATE)
    add(chamfer_12_piece_2, mode=Mode.SUBTRACT)

    # 草图14 → 切除-拉伸8 (cut)
    with BuildSketch(Plane(origin=(0, 4, 0), x_dir=(1, 0, 0), z_dir=(0, 1, 0))):
        with Locations((3, -13)):
            Circle(SKETCH_14_R)
        with Locations((3, -29)):
            Circle(SKETCH_14_R)
    extrude(amount=-CUT_EXTRUDE_8_DEPTH, mode=Mode.SUBTRACT)

    # 草图15 → 切除-拉伸9 (cut)
    with BuildSketch(Plane(origin=(0, 0, 0), x_dir=(-1, 0, 0), z_dir=(0, 0, -1))):
        Polygon((-7, 0.5), (16.731538073, 0.5), (16.731538073, -6.5), (-7, -6.5), (-7.5, -6.5), (-7.5, 0.5), align=None)
    extrude(amount=-CUT_EXTRUDE_9_DEPTH, mode=Mode.SUBTRACT)


solid = part.part
